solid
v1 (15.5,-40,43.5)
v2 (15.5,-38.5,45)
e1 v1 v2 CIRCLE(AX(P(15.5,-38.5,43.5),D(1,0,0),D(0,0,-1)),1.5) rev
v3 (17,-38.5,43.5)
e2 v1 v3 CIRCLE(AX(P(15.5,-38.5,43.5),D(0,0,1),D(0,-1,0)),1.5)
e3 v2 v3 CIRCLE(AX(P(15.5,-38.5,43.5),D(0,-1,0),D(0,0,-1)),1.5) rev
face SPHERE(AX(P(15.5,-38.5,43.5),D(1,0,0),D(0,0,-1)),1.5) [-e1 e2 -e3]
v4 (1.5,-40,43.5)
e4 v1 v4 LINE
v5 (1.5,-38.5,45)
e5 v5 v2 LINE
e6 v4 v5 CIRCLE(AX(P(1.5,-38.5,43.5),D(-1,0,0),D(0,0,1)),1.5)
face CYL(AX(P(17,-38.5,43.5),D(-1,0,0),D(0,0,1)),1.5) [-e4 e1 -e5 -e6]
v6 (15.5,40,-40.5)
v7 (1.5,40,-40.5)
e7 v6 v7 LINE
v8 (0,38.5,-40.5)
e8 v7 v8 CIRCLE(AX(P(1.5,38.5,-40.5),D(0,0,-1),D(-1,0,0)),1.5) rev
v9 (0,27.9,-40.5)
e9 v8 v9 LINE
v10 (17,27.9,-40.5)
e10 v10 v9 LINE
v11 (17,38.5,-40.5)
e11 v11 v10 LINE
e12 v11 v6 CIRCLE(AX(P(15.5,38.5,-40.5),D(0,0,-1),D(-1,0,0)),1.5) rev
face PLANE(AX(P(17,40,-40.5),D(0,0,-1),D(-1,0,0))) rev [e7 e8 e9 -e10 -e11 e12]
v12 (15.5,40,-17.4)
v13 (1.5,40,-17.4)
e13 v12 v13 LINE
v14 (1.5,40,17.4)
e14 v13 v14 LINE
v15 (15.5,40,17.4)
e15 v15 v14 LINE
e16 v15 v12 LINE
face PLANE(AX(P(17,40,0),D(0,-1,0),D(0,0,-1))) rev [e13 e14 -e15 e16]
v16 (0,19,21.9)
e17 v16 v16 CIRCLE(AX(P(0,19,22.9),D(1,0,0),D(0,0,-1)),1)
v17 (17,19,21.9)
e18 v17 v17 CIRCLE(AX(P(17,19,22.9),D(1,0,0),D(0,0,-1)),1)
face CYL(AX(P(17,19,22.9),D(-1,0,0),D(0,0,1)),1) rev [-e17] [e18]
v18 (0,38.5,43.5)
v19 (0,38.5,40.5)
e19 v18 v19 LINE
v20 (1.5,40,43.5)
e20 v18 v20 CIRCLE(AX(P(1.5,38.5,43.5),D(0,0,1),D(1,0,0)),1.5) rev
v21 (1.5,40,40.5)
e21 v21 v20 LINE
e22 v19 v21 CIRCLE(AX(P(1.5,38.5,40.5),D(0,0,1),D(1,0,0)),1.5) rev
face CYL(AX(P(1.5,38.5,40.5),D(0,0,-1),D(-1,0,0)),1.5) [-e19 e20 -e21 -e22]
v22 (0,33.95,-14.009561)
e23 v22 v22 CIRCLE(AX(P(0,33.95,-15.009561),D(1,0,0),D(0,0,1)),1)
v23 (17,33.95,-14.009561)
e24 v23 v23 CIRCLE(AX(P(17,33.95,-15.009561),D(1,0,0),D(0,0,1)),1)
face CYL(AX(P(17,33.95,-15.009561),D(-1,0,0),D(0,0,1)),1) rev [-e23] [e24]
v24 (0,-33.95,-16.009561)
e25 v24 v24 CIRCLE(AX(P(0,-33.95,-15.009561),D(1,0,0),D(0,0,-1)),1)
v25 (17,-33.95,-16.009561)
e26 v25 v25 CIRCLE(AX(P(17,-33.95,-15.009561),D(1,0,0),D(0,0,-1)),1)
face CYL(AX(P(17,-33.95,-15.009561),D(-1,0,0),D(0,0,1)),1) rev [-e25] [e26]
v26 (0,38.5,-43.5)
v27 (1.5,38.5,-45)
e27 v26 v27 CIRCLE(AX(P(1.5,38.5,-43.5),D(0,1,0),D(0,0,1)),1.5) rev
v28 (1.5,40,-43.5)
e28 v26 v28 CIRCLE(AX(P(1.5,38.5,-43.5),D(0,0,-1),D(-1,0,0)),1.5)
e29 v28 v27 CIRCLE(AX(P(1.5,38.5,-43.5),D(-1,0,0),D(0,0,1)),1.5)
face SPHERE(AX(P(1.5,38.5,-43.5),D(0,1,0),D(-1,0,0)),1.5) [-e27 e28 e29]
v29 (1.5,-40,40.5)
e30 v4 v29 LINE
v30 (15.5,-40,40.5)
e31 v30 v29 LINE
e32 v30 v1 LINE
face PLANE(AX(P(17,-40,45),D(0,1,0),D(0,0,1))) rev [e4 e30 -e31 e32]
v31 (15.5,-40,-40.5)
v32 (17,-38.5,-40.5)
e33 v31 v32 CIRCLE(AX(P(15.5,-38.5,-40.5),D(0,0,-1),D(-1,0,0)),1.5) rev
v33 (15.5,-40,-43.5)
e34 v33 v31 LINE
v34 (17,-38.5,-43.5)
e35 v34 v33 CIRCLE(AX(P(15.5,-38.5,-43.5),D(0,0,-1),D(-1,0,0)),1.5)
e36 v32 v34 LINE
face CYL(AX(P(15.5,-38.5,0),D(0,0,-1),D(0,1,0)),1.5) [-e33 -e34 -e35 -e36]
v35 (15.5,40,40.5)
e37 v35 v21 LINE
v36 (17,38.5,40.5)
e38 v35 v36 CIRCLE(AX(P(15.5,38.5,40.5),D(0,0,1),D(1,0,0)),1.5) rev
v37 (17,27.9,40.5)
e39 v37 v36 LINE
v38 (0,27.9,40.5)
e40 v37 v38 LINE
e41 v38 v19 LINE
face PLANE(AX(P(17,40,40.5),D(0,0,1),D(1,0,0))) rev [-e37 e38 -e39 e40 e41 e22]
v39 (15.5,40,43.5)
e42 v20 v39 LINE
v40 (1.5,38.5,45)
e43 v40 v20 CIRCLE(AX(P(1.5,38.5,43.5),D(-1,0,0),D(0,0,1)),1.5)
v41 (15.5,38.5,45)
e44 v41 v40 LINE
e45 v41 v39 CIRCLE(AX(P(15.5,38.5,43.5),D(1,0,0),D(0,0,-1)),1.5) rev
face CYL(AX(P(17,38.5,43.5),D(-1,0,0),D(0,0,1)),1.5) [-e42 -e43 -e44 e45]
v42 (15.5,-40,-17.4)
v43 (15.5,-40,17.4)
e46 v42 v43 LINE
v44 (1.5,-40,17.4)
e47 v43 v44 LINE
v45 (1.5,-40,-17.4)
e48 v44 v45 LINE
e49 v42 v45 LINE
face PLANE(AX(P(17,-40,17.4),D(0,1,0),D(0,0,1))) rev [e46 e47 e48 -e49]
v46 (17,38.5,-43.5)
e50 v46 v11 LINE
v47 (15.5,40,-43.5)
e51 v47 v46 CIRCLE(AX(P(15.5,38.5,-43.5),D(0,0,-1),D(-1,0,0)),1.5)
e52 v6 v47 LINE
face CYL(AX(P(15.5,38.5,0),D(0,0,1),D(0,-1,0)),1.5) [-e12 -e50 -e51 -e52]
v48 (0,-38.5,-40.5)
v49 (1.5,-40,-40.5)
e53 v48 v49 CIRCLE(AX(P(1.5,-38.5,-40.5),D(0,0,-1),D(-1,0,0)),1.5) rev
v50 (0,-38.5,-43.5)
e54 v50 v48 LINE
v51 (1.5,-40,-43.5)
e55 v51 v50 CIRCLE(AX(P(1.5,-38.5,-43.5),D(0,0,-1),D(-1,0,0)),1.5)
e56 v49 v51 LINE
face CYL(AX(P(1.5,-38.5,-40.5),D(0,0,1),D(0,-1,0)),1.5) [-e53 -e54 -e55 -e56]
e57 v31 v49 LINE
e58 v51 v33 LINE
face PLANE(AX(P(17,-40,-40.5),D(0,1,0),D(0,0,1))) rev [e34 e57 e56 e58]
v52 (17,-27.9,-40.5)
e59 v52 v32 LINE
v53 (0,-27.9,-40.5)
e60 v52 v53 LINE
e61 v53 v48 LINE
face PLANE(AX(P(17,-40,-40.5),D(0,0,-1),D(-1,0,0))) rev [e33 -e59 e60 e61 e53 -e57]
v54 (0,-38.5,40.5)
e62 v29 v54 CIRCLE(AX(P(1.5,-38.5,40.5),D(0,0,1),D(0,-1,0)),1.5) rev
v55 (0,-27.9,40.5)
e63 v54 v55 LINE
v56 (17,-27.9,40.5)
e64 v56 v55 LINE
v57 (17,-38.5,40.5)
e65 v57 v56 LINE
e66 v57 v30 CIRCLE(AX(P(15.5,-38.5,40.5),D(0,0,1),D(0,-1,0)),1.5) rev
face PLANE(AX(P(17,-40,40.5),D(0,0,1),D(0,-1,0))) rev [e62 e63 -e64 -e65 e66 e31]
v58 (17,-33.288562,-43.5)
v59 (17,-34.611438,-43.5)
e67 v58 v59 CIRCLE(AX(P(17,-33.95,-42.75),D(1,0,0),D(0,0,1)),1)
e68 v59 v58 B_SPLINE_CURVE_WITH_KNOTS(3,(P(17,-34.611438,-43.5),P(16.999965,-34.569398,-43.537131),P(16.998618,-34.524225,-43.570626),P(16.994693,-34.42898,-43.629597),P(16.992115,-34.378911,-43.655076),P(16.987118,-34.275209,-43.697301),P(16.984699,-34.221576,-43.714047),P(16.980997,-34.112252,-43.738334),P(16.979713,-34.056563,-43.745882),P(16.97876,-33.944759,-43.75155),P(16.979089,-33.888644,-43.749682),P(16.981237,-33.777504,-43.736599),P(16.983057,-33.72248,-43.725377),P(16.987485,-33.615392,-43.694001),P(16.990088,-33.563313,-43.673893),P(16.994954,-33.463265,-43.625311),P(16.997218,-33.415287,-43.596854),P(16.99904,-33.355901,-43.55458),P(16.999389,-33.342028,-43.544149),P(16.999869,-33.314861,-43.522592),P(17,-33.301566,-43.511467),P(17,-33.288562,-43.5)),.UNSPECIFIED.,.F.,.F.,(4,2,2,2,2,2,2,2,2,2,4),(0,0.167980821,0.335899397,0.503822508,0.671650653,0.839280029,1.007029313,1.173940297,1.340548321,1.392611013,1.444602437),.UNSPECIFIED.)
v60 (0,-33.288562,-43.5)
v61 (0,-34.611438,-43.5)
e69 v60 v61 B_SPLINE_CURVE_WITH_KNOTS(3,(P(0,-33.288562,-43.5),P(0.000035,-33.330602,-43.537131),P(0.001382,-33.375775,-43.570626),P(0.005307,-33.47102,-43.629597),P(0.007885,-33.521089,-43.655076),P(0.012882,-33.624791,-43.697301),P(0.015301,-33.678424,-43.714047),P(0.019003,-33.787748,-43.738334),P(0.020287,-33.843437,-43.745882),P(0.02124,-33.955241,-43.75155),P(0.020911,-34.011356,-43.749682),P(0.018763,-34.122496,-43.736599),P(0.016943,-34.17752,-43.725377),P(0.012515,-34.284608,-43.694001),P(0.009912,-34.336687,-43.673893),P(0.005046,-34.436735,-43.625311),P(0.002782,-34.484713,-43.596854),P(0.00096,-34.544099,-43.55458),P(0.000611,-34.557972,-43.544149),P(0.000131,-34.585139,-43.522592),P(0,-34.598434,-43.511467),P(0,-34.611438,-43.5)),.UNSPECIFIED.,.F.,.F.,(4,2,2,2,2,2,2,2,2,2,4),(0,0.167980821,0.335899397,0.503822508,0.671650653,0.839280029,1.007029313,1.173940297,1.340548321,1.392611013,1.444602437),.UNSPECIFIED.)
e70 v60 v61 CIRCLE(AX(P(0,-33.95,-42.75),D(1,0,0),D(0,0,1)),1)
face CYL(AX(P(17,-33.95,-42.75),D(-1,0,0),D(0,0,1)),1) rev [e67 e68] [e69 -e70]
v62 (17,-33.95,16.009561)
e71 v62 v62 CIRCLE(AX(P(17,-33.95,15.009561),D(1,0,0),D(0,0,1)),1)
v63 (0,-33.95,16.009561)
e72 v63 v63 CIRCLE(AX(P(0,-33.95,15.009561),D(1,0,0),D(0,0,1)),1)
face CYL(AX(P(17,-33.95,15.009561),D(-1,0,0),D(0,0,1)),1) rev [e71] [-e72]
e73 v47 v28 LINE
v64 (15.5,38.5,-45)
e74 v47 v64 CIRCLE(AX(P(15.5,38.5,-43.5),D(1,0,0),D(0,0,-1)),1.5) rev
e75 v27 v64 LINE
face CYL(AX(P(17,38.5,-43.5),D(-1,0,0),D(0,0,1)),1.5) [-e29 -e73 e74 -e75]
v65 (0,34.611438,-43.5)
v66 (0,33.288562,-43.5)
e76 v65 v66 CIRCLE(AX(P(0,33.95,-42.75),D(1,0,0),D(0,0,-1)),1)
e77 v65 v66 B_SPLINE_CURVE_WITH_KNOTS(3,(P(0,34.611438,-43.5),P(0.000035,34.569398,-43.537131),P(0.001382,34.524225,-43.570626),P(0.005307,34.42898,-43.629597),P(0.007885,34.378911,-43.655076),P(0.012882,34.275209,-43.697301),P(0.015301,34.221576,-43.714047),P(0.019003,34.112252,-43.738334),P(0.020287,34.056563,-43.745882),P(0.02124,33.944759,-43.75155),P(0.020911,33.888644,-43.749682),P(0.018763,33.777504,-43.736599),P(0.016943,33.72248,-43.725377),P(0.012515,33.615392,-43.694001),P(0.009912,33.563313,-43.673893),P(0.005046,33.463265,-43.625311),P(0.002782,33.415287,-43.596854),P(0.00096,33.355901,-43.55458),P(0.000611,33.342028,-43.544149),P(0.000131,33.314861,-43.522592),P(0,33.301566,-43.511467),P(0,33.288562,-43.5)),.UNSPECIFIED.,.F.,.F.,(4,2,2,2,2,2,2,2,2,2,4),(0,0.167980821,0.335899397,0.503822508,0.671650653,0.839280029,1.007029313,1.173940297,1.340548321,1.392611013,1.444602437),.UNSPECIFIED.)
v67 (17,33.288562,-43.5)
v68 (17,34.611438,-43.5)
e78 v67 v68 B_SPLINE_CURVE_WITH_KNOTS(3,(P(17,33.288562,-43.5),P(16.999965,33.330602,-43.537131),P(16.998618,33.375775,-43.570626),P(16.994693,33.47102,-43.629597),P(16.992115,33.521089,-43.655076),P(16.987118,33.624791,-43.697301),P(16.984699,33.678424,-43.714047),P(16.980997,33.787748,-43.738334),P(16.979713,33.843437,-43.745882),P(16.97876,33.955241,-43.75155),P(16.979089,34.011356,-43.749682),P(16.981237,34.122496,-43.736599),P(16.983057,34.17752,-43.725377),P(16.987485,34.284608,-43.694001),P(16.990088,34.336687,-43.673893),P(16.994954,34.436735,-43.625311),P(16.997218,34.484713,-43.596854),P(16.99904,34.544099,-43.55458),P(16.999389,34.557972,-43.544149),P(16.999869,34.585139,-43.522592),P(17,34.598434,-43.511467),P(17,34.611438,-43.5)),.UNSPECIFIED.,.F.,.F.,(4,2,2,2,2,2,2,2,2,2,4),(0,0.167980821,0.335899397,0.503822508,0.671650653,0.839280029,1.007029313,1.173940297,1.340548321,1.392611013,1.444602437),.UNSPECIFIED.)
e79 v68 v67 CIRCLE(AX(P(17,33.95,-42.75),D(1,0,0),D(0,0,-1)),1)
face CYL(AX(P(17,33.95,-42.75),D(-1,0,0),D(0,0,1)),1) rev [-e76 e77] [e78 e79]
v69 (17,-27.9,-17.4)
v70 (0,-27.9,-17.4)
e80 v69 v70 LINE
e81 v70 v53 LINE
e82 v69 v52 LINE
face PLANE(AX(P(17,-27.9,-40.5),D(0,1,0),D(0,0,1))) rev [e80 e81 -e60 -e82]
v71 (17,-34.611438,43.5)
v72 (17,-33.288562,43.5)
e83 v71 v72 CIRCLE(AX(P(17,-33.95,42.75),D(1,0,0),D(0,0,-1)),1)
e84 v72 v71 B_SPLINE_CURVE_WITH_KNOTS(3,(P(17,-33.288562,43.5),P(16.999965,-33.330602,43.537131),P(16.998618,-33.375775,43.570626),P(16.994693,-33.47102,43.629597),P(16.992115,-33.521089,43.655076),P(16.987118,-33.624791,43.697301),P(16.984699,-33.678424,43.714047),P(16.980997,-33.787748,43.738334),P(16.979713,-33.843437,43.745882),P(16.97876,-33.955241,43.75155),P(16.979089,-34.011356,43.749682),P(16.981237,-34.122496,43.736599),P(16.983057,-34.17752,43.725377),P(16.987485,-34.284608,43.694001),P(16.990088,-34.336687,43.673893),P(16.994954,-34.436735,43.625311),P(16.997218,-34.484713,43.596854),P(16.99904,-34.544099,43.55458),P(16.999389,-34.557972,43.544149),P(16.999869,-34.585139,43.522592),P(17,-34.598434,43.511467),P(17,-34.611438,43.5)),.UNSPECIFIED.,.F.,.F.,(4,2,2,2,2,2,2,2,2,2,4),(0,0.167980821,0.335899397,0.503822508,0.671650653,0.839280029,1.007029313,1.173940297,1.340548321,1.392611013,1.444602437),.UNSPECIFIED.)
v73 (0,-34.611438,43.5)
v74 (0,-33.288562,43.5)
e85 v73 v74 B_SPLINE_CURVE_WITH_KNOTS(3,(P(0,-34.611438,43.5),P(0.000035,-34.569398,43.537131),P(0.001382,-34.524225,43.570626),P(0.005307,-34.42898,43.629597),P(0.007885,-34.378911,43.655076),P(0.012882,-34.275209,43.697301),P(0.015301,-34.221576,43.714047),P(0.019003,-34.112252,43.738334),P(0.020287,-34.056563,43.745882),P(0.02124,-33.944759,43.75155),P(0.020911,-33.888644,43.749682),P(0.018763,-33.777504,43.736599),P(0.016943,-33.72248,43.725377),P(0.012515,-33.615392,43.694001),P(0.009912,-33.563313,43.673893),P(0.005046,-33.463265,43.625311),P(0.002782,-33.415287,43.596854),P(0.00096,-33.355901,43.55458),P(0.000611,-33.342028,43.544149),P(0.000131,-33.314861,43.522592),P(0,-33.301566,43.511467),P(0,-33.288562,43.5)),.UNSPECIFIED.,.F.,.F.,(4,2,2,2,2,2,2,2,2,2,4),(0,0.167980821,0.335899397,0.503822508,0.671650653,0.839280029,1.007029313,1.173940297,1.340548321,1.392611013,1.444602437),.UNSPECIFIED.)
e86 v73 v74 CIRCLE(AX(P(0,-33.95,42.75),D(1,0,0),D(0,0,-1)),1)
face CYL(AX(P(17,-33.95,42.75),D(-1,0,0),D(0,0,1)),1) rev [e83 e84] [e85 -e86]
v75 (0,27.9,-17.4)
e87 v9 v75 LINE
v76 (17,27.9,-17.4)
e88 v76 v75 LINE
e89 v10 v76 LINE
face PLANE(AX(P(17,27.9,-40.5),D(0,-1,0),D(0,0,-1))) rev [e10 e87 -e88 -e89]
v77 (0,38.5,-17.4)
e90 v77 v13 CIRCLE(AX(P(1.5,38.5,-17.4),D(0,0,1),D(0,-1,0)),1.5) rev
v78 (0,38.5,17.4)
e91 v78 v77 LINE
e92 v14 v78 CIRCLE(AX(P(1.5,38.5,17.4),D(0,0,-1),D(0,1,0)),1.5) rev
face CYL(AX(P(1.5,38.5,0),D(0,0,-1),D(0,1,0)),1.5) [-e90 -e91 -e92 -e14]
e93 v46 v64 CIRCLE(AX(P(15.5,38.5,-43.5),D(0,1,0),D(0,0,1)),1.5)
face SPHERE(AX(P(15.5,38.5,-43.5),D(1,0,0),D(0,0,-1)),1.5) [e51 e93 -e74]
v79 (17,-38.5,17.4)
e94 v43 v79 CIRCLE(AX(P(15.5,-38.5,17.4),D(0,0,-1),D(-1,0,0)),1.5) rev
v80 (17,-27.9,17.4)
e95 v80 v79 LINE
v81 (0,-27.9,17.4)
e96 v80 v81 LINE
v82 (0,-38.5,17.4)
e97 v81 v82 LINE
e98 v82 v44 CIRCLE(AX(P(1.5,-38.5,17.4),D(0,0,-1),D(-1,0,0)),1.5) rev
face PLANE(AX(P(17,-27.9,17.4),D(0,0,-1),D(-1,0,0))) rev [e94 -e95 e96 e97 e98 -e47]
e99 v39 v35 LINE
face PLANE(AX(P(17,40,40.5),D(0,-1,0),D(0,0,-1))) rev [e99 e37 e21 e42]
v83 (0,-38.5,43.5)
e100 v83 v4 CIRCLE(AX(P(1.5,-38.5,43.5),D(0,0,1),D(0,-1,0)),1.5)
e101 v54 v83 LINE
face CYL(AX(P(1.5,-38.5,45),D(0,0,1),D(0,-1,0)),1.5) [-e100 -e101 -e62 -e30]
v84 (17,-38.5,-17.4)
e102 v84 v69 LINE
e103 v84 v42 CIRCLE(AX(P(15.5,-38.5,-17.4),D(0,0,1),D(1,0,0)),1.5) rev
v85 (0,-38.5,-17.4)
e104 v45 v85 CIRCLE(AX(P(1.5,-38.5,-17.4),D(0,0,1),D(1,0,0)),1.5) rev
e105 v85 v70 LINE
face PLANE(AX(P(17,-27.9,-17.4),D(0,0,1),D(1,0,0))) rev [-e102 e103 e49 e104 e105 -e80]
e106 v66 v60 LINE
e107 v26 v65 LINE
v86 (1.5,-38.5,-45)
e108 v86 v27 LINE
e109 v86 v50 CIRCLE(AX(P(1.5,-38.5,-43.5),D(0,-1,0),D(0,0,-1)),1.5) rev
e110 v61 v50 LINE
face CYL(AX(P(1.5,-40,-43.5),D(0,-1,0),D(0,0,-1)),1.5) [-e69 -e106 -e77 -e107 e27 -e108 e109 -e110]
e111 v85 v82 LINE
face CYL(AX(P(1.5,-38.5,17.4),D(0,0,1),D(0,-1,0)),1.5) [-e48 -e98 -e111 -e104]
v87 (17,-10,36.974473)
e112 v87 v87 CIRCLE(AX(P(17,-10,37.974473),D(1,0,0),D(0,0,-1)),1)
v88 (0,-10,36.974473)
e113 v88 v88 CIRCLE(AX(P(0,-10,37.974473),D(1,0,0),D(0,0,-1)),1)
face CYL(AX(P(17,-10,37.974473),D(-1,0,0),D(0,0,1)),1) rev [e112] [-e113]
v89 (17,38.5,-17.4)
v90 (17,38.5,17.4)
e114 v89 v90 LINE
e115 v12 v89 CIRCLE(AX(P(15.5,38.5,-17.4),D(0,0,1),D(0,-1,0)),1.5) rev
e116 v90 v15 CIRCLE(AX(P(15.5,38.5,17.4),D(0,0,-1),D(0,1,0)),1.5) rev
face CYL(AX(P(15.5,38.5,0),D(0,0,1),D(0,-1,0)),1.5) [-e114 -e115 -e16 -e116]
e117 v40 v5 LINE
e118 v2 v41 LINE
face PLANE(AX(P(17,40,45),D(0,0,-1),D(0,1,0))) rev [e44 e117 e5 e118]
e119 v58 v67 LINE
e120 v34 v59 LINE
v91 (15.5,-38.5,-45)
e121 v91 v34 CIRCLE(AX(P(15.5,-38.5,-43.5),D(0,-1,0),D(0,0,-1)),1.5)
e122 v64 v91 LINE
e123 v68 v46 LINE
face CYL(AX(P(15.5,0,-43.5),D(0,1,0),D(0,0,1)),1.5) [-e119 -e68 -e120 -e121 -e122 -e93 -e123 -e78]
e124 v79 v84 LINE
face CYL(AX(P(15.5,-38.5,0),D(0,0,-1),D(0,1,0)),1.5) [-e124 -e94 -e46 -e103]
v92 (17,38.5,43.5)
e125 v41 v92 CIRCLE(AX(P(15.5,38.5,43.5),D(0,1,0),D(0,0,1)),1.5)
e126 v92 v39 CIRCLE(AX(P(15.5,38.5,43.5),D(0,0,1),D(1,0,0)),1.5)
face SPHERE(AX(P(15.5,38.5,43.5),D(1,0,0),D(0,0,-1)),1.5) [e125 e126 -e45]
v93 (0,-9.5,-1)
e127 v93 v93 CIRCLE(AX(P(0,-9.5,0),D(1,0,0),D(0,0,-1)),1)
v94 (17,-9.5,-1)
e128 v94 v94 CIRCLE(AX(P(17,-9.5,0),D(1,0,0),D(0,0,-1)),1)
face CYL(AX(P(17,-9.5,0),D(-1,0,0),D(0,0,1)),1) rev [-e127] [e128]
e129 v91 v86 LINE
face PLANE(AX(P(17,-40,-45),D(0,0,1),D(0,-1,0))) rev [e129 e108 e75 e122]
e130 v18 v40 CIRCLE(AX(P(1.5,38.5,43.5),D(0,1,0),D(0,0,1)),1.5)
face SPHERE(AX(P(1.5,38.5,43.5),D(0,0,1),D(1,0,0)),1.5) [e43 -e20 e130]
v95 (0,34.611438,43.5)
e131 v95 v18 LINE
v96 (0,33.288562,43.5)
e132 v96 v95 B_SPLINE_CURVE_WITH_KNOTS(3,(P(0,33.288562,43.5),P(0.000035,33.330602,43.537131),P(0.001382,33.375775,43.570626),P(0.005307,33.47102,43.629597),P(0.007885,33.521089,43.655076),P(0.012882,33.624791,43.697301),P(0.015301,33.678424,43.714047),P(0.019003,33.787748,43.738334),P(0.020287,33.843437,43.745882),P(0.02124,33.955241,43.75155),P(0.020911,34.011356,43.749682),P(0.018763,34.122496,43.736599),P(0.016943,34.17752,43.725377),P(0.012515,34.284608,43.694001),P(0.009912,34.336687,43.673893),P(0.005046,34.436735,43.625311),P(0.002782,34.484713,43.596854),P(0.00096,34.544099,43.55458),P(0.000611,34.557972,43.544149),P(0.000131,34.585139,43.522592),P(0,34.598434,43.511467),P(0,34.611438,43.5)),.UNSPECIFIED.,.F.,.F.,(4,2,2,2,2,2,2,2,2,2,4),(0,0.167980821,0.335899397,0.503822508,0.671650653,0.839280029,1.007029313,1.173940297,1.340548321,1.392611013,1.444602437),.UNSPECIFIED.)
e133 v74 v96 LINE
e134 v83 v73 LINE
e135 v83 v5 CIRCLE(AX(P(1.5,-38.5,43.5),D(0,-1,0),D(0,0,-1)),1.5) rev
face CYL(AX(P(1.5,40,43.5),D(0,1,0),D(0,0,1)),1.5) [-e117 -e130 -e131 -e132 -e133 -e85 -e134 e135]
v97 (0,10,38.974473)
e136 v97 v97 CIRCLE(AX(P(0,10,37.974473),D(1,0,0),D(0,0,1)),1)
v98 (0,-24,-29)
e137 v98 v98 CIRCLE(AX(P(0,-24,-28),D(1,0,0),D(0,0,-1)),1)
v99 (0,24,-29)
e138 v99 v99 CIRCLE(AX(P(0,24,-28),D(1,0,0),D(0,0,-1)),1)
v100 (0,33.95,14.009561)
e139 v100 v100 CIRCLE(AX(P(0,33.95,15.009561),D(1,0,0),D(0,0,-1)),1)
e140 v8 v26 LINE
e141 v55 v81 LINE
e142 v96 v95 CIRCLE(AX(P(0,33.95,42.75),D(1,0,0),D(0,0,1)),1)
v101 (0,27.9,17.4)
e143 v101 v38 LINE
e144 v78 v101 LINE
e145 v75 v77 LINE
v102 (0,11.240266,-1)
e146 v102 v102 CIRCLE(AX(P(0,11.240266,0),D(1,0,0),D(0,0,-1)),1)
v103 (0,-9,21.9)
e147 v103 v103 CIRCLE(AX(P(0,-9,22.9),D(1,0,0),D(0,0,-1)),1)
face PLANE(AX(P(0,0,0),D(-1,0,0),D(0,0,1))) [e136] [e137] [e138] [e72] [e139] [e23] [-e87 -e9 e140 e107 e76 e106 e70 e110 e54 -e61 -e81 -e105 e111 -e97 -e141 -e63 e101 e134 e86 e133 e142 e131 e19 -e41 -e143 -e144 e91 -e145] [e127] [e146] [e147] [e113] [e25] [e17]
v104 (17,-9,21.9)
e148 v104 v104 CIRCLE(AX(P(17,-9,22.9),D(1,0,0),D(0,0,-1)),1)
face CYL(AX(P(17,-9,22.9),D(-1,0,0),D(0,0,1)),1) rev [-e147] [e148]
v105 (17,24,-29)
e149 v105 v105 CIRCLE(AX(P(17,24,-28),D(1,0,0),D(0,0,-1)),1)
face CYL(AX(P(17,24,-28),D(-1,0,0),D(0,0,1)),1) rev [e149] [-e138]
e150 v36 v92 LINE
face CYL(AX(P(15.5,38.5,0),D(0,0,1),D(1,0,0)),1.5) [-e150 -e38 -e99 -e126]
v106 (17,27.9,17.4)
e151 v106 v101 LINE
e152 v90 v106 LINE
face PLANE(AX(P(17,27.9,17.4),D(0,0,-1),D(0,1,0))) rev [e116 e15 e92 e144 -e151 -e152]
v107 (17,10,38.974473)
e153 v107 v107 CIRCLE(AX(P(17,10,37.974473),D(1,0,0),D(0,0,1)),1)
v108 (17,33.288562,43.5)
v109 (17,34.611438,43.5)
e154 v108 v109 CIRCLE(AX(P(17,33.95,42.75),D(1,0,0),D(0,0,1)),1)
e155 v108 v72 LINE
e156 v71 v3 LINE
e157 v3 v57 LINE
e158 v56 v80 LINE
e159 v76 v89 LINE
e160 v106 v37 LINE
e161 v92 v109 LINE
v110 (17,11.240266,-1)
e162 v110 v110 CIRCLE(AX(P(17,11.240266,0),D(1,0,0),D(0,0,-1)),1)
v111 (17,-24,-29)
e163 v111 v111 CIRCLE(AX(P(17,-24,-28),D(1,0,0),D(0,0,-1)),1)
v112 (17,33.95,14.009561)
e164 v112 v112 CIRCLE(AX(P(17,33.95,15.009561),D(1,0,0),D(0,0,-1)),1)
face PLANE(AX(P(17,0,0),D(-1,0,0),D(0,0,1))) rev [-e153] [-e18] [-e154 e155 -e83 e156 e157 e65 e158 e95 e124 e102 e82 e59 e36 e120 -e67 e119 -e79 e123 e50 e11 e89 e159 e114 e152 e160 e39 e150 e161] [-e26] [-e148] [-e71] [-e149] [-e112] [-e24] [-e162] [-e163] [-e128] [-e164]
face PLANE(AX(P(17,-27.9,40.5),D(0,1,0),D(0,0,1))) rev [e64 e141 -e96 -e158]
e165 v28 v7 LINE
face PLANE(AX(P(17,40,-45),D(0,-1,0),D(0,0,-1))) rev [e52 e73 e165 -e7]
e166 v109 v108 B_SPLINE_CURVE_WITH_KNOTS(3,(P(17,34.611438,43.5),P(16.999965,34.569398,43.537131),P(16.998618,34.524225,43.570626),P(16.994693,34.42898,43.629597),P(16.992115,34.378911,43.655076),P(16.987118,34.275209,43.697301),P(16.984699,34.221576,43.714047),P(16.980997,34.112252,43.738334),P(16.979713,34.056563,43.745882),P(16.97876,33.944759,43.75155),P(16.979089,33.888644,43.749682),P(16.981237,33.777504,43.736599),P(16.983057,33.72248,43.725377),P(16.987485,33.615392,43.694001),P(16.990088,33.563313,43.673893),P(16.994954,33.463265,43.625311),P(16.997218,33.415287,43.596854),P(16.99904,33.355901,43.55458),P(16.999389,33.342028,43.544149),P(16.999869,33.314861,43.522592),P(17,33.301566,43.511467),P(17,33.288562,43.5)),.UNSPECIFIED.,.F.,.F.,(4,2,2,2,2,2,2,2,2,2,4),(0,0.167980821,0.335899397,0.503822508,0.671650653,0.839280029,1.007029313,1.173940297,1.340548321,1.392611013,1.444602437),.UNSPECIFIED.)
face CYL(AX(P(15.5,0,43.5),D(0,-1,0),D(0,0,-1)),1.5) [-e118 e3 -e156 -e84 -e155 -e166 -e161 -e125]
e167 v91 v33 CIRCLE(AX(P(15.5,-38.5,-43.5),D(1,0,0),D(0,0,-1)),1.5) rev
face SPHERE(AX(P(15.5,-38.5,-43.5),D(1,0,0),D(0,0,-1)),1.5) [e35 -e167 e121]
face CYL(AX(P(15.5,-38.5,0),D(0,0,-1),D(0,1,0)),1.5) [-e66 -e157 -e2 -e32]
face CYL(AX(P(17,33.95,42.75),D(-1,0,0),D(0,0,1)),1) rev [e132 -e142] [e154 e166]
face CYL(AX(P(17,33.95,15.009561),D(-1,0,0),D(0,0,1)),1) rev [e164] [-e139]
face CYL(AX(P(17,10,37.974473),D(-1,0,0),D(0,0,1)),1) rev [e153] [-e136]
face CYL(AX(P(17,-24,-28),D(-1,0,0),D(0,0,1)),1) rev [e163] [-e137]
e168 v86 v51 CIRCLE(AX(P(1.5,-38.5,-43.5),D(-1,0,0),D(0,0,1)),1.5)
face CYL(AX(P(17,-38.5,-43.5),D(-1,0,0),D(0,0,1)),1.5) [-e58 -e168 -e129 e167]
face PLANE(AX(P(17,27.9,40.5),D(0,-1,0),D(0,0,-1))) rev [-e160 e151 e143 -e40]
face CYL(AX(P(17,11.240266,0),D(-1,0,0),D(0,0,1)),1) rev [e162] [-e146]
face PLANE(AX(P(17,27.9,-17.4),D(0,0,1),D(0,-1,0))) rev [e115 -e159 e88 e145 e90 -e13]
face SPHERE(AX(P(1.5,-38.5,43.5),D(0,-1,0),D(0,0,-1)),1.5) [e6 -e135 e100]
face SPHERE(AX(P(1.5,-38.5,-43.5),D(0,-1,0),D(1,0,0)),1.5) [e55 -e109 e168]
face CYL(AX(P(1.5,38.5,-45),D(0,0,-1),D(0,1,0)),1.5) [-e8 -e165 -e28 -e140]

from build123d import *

# Parameters (mm, degrees)
SKETCH_1_R      = 1
EXTRUDE_1_DEPTH = 17
FILLET_1_R      = 1.5


with BuildPart() as part:
    # Эскиз1 → Бобышка-Вытянуть1 (new body)
    with BuildSketch(Plane(origin=(0, 0, 0), x_dir=(0, 0, -1), z_dir=(1, 0, 0))):
        Polygon((0, 40), (-17.4, 40), (-17.4, 27.9), (-40.5, 27.9), (-40.5, 40), (-45, 40), (-45, -40), (-40.5, -40), (-40.5, -27.9), (-17.4, -27.9), (-17.4, -40), (17.4, -40), (17.4, -27.9), (40.5, -27.9), (40.5, -40), (45, -40), (45, 40), (40.5, 40), (40.5, 27.9), (17.4, 27.9), (17.4, 40), align=None)
        with Locations((-42.75, -33.95)):
            Circle(SKETCH_1_R, mode=Mode.SUBTRACT)
        with Locations(Location((-15.009561353, -33.95, 0), (0, 0, 180))):
            Circle(SKETCH_1_R, mode=Mode.SUBTRACT)
        with Locations((15.009561353, -33.95)):
            Circle(SKETCH_1_R, mode=Mode.SUBTRACT)
        with Locations(Location((42.75, -33.95, 0), (0, 0, 180))):
            Circle(SKETCH_1_R, mode=Mode.SUBTRACT)
        with Locations((42.75, 33.95)):
            Circle(SKETCH_1_R, mode=Mode.SUBTRACT)
        with Locations(Location((15.009561353, 33.95, 0), (0, 0, 180))):
            Circle(SKETCH_1_R, mode=Mode.SUBTRACT)
        with Locations((-15.009561353, 33.95)):
            Circle(SKETCH_1_R, mode=Mode.SUBTRACT)
        with Locations(Location((-42.75, 33.95, 0), (0, 0, 180))):
            Circle(SKETCH_1_R, mode=Mode.SUBTRACT)
        with Locations((28, 24)):
            Circle(SKETCH_1_R, mode=Mode.SUBTRACT)
        with Locations((28, -24)):
            Circle(SKETCH_1_R, mode=Mode.SUBTRACT)
        with Locations((-22.9, -9)):
            Circle(SKETCH_1_R, mode=Mode.SUBTRACT)
        with Locations((-22.9, 19)):
            Circle(SKETCH_1_R, mode=Mode.SUBTRACT)
        with Locations((-37.974473267, -10)):
            Circle(SKETCH_1_R, mode=Mode.SUBTRACT)
        with Locations(Location((-37.974473267, 10, 0), (0, 0, 180))):
            Circle(SKETCH_1_R, mode=Mode.SUBTRACT)
        with Locations((0, 11.240266093)):
            Circle(SKETCH_1_R, mode=Mode.SUBTRACT)
        with Locations((0, -9.5)):
            Circle(SKETCH_1_R, mode=Mode.SUBTRACT)
    extrude(amount=EXTRUDE_1_DEPTH)

    # Скругление1
    # the kernel refuses this fillet: 1.5 mm, written as the material it takes off along each edge
    with BuildSketch(Plane(origin=(1.5, 38.5, -43.5), x_dir=(0, 0, -1), z_dir=(0, 1, 0))) as fillet_1_piece_1_section:
        Polygon((0, 0), (FILLET_1_R, 0), (FILLET_1_R, FILLET_1_R), (0, FILLET_1_R), align=None)
    fillet_1_piece_1 = extrude(amount=FILLET_1_R, mode=Mode.PRIVATE)
    fillet_1_piece_1 = fillet_1_piece_1 - Plane(origin=(1.5, 38.5, -43.5), x_dir=(0.7071067811865475, 0, 0.7071067811865475), z_dir=(0, 1, 0)) * Sphere(FILLET_1_R, mode=Mode.PRIVATE)
    add(fillet_1_piece_1, mode=Mode.SUBTRACT)
    with BuildSketch(Plane(origin=(1.5, -38.5, -43.5), x_dir=(0, 0, -1), z_dir=(-1, 0, 0))) as fillet_1_piece_2_section:
        Polygon((0, 0), (FILLET_1_R, 0), (FILLET_1_R, FILLET_1_R), (0, FILLET_1_R), align=None)
    fillet_1_piece_2 = extrude(amount=FILLET_1_R, mode=Mode.PRIVATE)
    fillet_1_piece_2 = fillet_1_piece_2 - Plane(origin=(1.5, -38.5, -43.5), x_dir=(0, 0.707106781186548, 0.707106781186547), z_dir=(-1, 0, 0)) * Sphere(FILLET_1_R, mode=Mode.PRIVATE)
    add(fillet_1_piece_2, mode=Mode.SUBTRACT)
    with BuildSketch(Plane(origin=(15.5, 38.5, 43.5), x_dir=(1, 0, 0), z_dir=(0, 1, 0))) as fillet_1_piece_3_section:
        Polygon((0, 0), (FILLET_1_R, 0), (FILLET_1_R, -FILLET_1_R), (0, -FILLET_1_R), align=None)
    fillet_1_piece_3 = extrude(amount=FILLET_1_R, mode=Mode.PRIVATE)
    fillet_1_piece_3 = fillet_1_piece_3 - Plane(origin=(15.5, 38.5, 43.5), x_dir=(-0.7071067811865475, 0, -0.7071067811865475), z_dir=(0, 1, 0)) * Sphere(FILLET_1_R, mode=Mode.PRIVATE)
    add(fillet_1_piece_3, mode=Mode.SUBTRACT)
    with BuildSketch(Plane(origin=(1.5, -38.5, 43.5), x_dir=(0, -1, 0), z_dir=(-1, 0, 0))) as fillet_1_piece_4_section:
        Polygon((0, 0), (FILLET_1_R, 0), (FILLET_1_R, FILLET_1_R), (0, FILLET_1_R), align=None)
    fillet_1_piece_4 = extrude(amount=FILLET_1_R, mode=Mode.PRIVATE)
    fillet_1_piece_4 = fillet_1_piece_4 - Plane(origin=(1.5, -38.5, 43.5), x_dir=(0, 0.7071067811865486, -0.7071067811865464), z_dir=(-1, 0, 0)) * Sphere(FILLET_1_R, mode=Mode.PRIVATE)
    add(fillet_1_piece_4, mode=Mode.SUBTRACT)
    with BuildSketch(Plane(origin=(1.5, 38.5, 43.5), x_dir=(-1, 0, 0), z_dir=(0, 1, 0))) as fillet_1_piece_5_section:
        Polygon((0, 0), (FILLET_1_R, 0), (FILLET_1_R, FILLET_1_R), (0, FILLET_1_R), align=None)
    fillet_1_piece_5 = extrude(amount=FILLET_1_R, mode=Mode.PRIVATE)
    fillet_1_piece_5 = fillet_1_piece_5 - Plane(origin=(1.5, 38.5, 43.5), x_dir=(0.7071067811865475, 0, -0.7071067811865475), z_dir=(0, 1, 0)) * Sphere(FILLET_1_R, mode=Mode.PRIVATE)
    add(fillet_1_piece_5, mode=Mode.SUBTRACT)
    with BuildSketch(Plane(origin=(15.5, -38.5, 43.5), x_dir=(0, -1, 0), z_dir=(1, 0, 0))) as fillet_1_piece_6_section:
        Polygon((0, 0), (FILLET_1_R, 0), (FILLET_1_R, -FILLET_1_R), (0, -FILLET_1_R), align=None)
    fillet_1_piece_6 = extrude(amount=FILLET_1_R, mode=Mode.PRIVATE)
    fillet_1_piece_6 = fillet_1_piece_6 - Plane(origin=(15.5, -38.5, 43.5), x_dir=(0, 0.7071067811865486, -0.7071067811865464), z_dir=(1, 0, 0)) * Sphere(FILLET_1_R, mode=Mode.PRIVATE)
    add(fillet_1_piece_6, mode=Mode.SUBTRACT)
    with BuildSketch(Plane(origin=(15.5, 38.5, -43.5), x_dir=(0, 1, 0), z_dir=(1, 0, 0))) as fillet_1_piece_7_section:
        Polygon((0, 0), (FILLET_1_R, 0), (FILLET_1_R, -FILLET_1_R), (0, -FILLET_1_R), align=None)
    fillet_1_piece_7 = extrude(amount=FILLET_1_R, mode=Mode.PRIVATE)
    fillet_1_piece_7 = fillet_1_piece_7 - Plane(origin=(15.5, 38.5, -43.5), x_dir=(0, -0.707106781186548, 0.7071067811865469), z_dir=(1, 0, 0)) * Sphere(FILLET_1_R, mode=Mode.PRIVATE)
    add(fillet_1_piece_7, mode=Mode.SUBTRACT)
    with BuildSketch(Plane(origin=(15.5, -38.5, -43.5), x_dir=(0, 0, -1), z_dir=(1, 0, 0))) as fillet_1_piece_8_section:
        Polygon((0, 0), (FILLET_1_R, 0), (FILLET_1_R, -FILLET_1_R), (0, -FILLET_1_R), align=None)
    fillet_1_piece_8 = extrude(amount=FILLET_1_R, mode=Mode.PRIVATE)
    fillet_1_piece_8 = fillet_1_piece_8 - Plane(origin=(15.5, -38.5, -43.5), x_dir=(0, 0.707106781186548, 0.707106781186547), z_dir=(1, 0, 0)) * Sphere(FILLET_1_R, mode=Mode.PRIVATE)
    add(fillet_1_piece_8, mode=Mode.SUBTRACT)
    with BuildSketch(Plane(origin=(0, 40, -43.5), x_dir=(1, 0, 0), z_dir=(0, 0, 1)), Plane(origin=(0, -40, -36.75), x_dir=(1, 0, 0), z_dir=(0, 0, -1)), Plane(origin=(17, 40, 36.75), x_dir=(0, -1, 0), z_dir=(0, 0, 1)), Plane(origin=(0, -40, 43.5), x_dir=(1, 0, 0), z_dir=(0, 0, -1)), Plane(origin=(0, 40, 36.75), x_dir=(1, 0, 0), z_dir=(0, 0, 1)), Plane(origin=(17, -40, 43.5), x_dir=(0, 1, 0), z_dir=(0, 0, -1)), Plane(origin=(17, -40, -36.75), x_dir=(0, 1, 0), z_dir=(0, 0, -1)), Plane(origin=(17, 40, -43.5), x_dir=(0, -1, 0), z_dir=(0, 0, 1))) as fillet_1_piece_9:
        with BuildLine():
            CenterArc((FILLET_1_R, -FILLET_1_R), FILLET_1_R, 90, 90)
            Line((0, -FILLET_1_R), (0, 0))
            Line((0, 0), (FILLET_1_R, 0))
        make_face()
    extrude(amount=6.75, mode=Mode.SUBTRACT)
    with BuildSketch(Plane(origin=(0, -38.5, -45), x_dir=(1, 0, 0), z_dir=(0, 1, 0)), Plane(origin=(0, 38.5, 45), x_dir=(1, 0, 0), z_dir=(0, -1, 0)), Plane(origin=(17, 38.5, 45), x_dir=(0, 0, -1), z_dir=(0, -1, 0)), Plane(origin=(17, -38.5, -45), x_dir=(0, 0, 1), z_dir=(0, 1, 0))) as fillet_1_piece_10:
        with BuildLine():
            CenterArc((FILLET_1_R, -FILLET_1_R), FILLET_1_R, 90, 90)
            Line((0, -FILLET_1_R), (0, 0))
            Line((0, 0), (FILLET_1_R, 0))
        make_face()
    extrude(amount=77, mode=Mode.SUBTRACT)
    with BuildSketch(Plane(origin=(0, -40, 21.15), x_dir=(1, 0, 0), z_dir=(0, 0, -1)), Plane(origin=(0, 40, -21.15), x_dir=(1, 0, 0), z_dir=(0, 0, 1)), Plane(origin=(17, -40, 21.15), x_dir=(0, 1, 0), z_dir=(0, 0, -1)), Plane(origin=(17, 40, 21.15), x_dir=(-1, 0, 0), z_dir=(0, 0, -1))) as fillet_1_piece_11:
        with BuildLine():
            CenterArc((FILLET_1_R, -FILLET_1_R), FILLET_1_R, 90, 90)
            Line((0, -FILLET_1_R), (0, 0))
            Line((0, 0), (FILLET_1_R, 0))
        make_face()
    extrude(amount=42.3, mode=Mode.SUBTRACT)
    with BuildSketch(Plane(origin=(1.5, 40, -45), x_dir=(0, 0, 1), z_dir=(1, 0, 0)), Plane(origin=(1.5, -40, -45), x_dir=(0, 1, 0), z_dir=(1, 0, 0)), Plane(origin=(1.5, -40, 45), x_dir=(0, 0, -1), z_dir=(1, 0, 0)), Plane(origin=(1.5, 40, 45), x_dir=(0, -1, 0), z_dir=(1, 0, 0))) as fillet_1_piece_12:
        with BuildLine():
            CenterArc((FILLET_1_R, FILLET_1_R), FILLET_1_R, 180, 90)
            Line((0, FILLET_1_R), (0, 0))
            Line((0, 0), (FILLET_1_R, 0))
        make_face()
    extrude(amount=14, mode=Mode.SUBTRACT)


solid = part.part
